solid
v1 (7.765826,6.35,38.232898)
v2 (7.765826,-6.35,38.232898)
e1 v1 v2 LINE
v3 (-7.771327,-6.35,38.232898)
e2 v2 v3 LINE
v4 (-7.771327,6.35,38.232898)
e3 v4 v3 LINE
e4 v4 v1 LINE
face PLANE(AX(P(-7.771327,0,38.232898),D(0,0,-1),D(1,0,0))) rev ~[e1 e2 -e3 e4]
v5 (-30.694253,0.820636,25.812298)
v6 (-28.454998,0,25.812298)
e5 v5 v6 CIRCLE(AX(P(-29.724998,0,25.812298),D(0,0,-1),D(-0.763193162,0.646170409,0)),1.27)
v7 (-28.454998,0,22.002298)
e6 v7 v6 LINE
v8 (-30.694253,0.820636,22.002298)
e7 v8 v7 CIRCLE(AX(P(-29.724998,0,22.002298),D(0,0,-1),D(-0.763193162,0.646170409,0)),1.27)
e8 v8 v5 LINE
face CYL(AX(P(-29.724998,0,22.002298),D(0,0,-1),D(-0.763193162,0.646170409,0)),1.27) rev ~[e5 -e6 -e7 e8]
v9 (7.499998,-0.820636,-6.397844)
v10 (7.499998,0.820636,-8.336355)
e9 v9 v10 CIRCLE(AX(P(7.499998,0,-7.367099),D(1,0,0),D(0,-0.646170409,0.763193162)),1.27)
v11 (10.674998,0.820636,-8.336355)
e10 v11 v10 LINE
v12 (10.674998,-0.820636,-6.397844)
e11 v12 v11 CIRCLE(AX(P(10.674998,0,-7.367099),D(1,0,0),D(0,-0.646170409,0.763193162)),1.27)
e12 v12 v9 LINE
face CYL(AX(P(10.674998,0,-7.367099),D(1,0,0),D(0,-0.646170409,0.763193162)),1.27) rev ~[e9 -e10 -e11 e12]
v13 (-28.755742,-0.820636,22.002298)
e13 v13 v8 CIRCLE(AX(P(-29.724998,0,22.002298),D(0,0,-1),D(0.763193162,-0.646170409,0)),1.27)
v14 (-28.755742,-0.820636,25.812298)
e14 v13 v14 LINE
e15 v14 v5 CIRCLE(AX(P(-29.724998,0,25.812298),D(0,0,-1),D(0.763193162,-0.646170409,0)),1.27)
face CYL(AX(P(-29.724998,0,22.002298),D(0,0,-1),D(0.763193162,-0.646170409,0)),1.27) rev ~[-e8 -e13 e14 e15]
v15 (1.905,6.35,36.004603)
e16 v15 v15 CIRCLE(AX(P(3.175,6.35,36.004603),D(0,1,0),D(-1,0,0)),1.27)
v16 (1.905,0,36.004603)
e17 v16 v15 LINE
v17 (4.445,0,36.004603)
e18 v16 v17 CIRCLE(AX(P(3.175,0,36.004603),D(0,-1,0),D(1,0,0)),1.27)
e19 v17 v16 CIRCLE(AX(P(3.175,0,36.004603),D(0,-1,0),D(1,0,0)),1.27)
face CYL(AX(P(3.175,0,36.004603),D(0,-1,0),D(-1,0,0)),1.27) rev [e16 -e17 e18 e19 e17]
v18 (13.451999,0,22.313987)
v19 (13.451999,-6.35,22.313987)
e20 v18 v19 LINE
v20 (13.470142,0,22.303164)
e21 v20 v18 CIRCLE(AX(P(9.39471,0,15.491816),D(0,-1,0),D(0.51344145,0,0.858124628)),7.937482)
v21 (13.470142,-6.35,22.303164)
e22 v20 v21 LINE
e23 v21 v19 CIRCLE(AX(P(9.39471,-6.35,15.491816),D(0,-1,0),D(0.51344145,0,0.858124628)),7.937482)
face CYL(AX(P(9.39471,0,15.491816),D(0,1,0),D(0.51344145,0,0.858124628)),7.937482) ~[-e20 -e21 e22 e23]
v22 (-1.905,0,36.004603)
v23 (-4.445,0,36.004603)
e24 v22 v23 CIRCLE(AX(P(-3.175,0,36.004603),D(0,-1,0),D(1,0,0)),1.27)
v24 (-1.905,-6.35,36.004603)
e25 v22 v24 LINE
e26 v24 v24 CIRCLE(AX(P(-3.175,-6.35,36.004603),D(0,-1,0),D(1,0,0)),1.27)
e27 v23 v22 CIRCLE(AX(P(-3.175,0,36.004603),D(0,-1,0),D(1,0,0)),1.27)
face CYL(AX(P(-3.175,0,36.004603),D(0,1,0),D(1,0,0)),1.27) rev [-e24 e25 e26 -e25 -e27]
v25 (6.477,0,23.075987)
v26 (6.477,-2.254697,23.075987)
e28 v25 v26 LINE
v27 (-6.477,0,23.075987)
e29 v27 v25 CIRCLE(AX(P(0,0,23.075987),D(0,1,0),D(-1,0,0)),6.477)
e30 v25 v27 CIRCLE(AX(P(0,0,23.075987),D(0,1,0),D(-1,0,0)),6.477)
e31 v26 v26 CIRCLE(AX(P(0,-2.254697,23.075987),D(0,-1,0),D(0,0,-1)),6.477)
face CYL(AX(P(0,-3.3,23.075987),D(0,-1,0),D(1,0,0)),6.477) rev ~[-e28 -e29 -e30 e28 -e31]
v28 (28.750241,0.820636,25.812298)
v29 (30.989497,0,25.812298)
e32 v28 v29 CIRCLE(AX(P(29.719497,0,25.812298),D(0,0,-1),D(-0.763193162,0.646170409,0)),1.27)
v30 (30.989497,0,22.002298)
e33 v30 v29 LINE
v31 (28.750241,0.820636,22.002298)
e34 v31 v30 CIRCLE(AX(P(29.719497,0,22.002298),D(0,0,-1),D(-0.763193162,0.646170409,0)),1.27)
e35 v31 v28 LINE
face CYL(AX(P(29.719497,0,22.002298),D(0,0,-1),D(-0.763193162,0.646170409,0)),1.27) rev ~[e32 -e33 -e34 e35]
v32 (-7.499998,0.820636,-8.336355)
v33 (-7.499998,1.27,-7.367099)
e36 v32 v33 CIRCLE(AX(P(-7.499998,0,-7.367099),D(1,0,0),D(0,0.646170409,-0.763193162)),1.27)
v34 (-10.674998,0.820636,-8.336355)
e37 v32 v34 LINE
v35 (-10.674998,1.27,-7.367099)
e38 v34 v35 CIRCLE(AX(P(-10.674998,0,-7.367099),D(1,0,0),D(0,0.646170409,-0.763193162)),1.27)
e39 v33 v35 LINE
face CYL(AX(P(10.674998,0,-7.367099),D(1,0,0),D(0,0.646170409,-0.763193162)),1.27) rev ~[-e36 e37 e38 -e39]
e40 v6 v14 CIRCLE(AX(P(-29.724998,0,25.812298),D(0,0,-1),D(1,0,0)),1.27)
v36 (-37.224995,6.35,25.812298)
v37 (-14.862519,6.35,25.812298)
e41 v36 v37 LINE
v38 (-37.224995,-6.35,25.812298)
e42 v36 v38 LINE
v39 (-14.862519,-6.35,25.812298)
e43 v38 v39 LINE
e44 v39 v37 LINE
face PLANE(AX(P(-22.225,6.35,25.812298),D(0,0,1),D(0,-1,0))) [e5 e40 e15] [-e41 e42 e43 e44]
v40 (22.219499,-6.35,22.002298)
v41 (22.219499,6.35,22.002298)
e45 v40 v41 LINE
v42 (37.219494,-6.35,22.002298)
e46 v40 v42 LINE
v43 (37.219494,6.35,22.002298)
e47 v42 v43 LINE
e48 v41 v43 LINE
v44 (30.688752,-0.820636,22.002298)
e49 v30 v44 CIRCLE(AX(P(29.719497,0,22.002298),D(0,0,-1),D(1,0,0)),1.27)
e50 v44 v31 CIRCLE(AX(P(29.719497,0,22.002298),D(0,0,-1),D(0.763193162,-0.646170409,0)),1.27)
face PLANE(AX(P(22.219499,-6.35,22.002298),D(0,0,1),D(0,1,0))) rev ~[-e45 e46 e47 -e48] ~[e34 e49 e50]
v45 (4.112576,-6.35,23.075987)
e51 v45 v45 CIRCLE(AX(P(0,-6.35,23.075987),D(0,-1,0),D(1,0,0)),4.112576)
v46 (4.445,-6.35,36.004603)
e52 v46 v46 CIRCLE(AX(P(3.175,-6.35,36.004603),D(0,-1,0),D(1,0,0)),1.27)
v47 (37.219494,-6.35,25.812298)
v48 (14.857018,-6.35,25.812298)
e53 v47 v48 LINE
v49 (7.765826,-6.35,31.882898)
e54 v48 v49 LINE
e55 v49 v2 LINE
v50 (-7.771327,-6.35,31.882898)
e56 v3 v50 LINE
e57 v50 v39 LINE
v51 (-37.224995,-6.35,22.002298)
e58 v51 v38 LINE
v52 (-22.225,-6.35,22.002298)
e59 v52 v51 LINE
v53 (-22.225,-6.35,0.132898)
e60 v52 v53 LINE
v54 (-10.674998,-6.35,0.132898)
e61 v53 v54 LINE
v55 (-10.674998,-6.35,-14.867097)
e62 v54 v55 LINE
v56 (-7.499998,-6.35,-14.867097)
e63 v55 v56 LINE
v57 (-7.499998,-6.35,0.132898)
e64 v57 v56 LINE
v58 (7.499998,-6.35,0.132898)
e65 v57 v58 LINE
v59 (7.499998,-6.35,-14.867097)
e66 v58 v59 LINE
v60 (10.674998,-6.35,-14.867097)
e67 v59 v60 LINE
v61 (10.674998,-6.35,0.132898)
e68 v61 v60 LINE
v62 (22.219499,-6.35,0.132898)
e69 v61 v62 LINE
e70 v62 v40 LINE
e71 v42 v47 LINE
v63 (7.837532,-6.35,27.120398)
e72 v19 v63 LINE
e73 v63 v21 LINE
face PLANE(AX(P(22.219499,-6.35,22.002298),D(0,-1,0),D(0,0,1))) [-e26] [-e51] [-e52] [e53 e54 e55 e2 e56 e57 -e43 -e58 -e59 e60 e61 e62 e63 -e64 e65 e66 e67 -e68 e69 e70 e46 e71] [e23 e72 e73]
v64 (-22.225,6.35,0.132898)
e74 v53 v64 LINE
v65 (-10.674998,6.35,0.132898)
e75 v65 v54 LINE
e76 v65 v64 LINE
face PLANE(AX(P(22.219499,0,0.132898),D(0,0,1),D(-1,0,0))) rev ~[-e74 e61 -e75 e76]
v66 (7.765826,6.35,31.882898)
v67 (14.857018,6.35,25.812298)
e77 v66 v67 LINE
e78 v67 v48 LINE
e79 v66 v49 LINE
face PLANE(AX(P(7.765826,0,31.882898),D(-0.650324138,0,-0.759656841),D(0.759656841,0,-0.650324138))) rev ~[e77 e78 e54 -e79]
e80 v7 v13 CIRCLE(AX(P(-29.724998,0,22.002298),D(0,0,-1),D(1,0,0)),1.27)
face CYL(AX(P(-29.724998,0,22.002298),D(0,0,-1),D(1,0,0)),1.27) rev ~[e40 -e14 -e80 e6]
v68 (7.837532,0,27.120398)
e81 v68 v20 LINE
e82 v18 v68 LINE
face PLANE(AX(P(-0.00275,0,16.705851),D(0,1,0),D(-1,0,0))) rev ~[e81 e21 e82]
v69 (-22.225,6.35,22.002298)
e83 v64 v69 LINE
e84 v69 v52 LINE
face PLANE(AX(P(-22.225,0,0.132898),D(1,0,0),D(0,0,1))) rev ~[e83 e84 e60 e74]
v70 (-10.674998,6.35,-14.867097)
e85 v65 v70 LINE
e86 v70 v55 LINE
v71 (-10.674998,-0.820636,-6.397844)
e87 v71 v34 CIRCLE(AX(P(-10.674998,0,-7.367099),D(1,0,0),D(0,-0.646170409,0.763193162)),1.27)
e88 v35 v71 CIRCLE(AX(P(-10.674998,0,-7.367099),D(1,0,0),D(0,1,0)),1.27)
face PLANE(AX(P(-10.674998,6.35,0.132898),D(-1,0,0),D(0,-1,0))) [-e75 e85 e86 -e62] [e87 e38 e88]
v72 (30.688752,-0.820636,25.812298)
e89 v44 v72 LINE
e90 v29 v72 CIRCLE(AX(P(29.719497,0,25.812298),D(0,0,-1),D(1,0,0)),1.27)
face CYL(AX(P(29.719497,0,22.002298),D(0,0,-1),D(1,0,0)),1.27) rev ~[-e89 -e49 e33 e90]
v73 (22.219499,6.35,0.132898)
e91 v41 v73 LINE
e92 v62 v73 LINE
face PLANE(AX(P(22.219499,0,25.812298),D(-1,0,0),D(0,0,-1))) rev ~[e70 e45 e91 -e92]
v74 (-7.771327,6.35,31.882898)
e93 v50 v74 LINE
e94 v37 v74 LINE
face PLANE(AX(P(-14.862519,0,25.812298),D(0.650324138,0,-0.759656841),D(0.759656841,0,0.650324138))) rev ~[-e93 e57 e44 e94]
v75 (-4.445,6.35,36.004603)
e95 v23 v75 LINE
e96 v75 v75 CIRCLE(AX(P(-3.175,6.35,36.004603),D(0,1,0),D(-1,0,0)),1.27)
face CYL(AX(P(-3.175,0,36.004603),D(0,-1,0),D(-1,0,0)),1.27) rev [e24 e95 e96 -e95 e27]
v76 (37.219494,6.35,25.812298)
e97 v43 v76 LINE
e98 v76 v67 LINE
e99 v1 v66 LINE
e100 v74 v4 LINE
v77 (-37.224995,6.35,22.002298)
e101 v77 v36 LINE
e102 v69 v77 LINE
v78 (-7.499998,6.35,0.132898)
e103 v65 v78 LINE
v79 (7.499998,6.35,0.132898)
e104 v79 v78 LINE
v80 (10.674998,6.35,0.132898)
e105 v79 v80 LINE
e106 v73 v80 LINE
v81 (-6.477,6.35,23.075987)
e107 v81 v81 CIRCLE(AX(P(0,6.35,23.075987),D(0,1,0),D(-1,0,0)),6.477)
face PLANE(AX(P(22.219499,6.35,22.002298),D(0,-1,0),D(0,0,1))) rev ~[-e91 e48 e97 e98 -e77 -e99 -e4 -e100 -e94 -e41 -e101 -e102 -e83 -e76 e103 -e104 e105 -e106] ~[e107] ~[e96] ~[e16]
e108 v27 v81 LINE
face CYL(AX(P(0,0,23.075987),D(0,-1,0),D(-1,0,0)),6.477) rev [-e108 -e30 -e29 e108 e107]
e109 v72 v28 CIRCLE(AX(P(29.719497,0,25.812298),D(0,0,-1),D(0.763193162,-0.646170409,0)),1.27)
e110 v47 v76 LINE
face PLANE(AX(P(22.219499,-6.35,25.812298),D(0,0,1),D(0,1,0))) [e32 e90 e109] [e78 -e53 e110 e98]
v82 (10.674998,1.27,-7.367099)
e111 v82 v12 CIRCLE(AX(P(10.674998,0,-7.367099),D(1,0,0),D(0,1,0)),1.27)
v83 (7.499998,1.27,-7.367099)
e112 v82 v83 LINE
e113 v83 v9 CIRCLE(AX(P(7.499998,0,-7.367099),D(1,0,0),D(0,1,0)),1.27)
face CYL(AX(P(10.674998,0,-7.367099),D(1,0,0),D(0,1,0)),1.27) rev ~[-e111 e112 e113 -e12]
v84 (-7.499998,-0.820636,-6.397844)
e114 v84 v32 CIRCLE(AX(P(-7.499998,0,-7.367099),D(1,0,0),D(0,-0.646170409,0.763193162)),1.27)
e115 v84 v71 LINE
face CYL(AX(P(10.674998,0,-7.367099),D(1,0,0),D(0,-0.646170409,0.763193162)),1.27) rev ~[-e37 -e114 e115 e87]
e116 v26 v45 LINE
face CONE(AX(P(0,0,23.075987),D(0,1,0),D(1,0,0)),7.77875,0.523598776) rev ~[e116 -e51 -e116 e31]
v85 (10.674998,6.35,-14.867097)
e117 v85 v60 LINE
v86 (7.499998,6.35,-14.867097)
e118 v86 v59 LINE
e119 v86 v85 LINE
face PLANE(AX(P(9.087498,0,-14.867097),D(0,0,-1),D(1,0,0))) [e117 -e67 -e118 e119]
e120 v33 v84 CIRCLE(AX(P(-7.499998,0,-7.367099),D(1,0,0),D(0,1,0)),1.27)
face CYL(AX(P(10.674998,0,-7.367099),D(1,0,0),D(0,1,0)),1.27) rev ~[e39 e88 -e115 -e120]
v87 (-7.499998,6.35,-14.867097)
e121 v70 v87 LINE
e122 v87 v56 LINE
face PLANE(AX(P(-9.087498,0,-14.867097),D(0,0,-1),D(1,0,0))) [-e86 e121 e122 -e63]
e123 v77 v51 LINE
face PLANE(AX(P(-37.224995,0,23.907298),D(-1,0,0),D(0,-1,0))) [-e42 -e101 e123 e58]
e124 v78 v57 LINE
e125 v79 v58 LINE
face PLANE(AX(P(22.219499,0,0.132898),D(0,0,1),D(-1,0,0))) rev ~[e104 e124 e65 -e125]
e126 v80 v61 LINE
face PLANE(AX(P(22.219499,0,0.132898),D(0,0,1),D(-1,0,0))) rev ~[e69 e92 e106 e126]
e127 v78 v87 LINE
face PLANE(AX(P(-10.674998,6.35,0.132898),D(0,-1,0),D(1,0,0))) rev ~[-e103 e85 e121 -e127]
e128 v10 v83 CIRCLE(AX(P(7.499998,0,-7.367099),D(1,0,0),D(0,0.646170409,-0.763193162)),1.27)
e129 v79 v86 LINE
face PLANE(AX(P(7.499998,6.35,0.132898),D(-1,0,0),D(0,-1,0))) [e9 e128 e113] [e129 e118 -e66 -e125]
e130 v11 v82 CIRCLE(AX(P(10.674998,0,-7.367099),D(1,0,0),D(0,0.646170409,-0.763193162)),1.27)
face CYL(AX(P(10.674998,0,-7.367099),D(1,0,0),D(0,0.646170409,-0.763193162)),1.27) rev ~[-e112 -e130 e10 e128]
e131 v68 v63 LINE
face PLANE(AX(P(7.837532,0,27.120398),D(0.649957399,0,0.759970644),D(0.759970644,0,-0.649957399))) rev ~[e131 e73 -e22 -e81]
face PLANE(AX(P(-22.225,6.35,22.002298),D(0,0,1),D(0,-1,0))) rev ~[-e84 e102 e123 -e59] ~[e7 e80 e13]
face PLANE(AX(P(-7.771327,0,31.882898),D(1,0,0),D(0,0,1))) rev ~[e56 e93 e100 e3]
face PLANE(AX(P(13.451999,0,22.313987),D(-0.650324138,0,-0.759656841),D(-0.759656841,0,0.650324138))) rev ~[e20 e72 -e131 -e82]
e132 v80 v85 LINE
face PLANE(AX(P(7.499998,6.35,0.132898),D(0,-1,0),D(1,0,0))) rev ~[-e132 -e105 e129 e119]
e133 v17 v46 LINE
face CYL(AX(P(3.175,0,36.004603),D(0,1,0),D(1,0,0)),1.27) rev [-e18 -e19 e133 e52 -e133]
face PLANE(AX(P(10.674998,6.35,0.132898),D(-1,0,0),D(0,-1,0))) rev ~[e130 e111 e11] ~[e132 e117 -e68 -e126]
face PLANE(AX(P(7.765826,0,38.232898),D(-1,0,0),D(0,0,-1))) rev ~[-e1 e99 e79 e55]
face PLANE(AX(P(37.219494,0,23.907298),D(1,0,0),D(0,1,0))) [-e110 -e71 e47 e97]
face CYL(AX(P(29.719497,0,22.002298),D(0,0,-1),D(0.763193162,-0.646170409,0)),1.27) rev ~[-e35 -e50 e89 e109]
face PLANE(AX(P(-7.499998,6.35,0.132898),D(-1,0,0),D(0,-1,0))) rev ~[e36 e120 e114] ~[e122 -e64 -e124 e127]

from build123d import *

# Parameters (mm, degrees)
F0_R        = 1.27
F0_R_2      = 3.96875
F1_DEPTH    = 6.35
F2_R        = 6.477
F2_R_2      = 1.27
F3_DEPTH    = 6.35
F4_S5_R     = 6.477
F4_T6_DEPTH = 13
F5_W        = 12.7
F5_H        = 3.81
F6_DEPTH    = 14.9999954
F8_DEPTH    = 25.4
F9_W        = 12.7
F9_H        = 3.81
F10_DEPTH   = 14.9999954
F12_DEPTH   = 25.4
F13_W       = 3.175
F13_H       = 12.7
F14_DEPTH   = 14.9999954
F16_DEPTH   = 25.4


# Not quite as in the source:
# - a fillet or chamfer that OpenCascade refuses, or shapes differently, is made with other operations: its cross-section is extruded or revolved along the edge and cut away or added
# - after a boolean that leaves OpenCascade's solid faulty, fix() repairs it
# - ends of sketch curves that miss each other by under 0.0002 mm in the source are joined


with BuildPart() as f1:
    # F0 (on Front) → F1 (new body)
    with BuildSketch(Plane.XZ):
        Polygon((-7.493, 0.1328983575), (0, 0.1328983575), (7.493, 0.1328983575), (22.2194990303, 0.1328983575), (22.2194990303, 19.5094533027), (14.8570176459, 25.8122983575), (7.7658264293, 31.8828983575), (7.7658264293, 38.2328983575), (-7.7713273633, 38.2328983575), (-7.7713273633, 31.8828983575), (-14.8625185798, 25.8122983575), (-22.2249999642, 19.5094533027), (-22.2249999642, 4.5234533027), (-22.2249999642, 0.1328983575), align=None)
        with Locations((-3.175, 36.0046029091)):
            Circle(F0_R, mode=Mode.SUBTRACT)
        with BuildLine():
            ThreePointArc((-1.6471995105, 13.7654938087), (-14.0416307026, 9.056743723), (-13.4701421127, 22.3031640975))
            Line((-13.4701421127, 22.3031640975), (-7.8430329322, 27.1203983575))
            Line((-7.8430329322, 27.1203983575), (-3.175, 27.1203983575))
            Line((-3.175, 27.1203983575), (-3.175, 30.2953983575))
            Line((-3.175, 30.2953983575), (-3.175, 33.4703983575))
            Line((-3.175, 33.4703983575), (3.175, 33.4703983575))
            Line((3.175, 33.4703983575), (3.175, 30.2953983575))
            Line((3.175, 30.2953983575), (3.175, 27.1203983575))
            Line((3.175, 27.1203983575), (7.8375319983, 27.1203983575))
            Line((7.8375319983, 27.1203983575), (13.4701421127, 22.3031640975))
            ThreePointArc((13.4701421127, 22.3031640975), (16.2995077669, 19.40684068), (17.3322006389, 15.4917998403))
            ThreePointArc((17.3322006389, 15.4917998403), (10.2711150187, 7.6028326022), (1.6507381924, 13.7496885133))
            ThreePointArc((1.6507381924, 13.7496885133), (0.0063534061, 14.7141035739), (-1.6471995105, 13.7654938087))
        make_face(mode=Mode.SUBTRACT)
        with Locations((3.175, 36.0046029091)):
            Circle(F0_R, mode=Mode.SUBTRACT)
        Polygon((14.8570176459, 25.8122983575), (22.2194990303, 19.5094533027), (22.2194990303, 25.8122983575), (17.4187807526, 25.8122983575), align=None)
        Polygon((-22.2249999642, 25.8122983575), (-22.2249999642, 19.5094533027), (-14.8625185798, 25.8122983575), (-17.4242816865, 25.8122983575), align=None)
        with BuildLine():
            ThreePointArc((13.4519986436, 22.3139871107), (4.7326542757, 21.9159130054), (1.6507381924, 13.7496885133))
            ThreePointArc((1.6507381924, 13.7496885133), (10.2711150187, 7.6028326022), (17.3322006389, 15.4917998403))
            ThreePointArc((17.3322006389, 15.4917998403), (16.2995077669, 19.40684068), (13.4701421127, 22.3031640975))
            ThreePointArc((13.4701421127, 22.3031640975), (13.461073979, 22.3085816404), (13.4519986436, 22.3139871107))
        make_face()
        with BuildLine():
            ThreePointArc((-1.4572006389, 15.4917998403), (-5.4796598384, 22.3966069904), (-13.4701421898, 22.3031640514))
            ThreePointArc((-13.4701421127, 22.3031640975), (-14.0416307026, 9.056743723), (-1.6471995105, 13.7654938087))
            ThreePointArc((-1.6471995105, 13.7654938087), (-1.5048433381, 14.6234346974), (-1.4572006389, 15.4917998403))
        make_face()
        with BuildLine():
            Line((-7.8430329322, 27.1203983575), (-13.4701422669, 22.3031640053))
            ThreePointArc((-13.4701421898, 22.3031640514), (-5.4796598384, 22.3966069904), (-1.4572006389, 15.4917998403))
            ThreePointArc((-1.4572006389, 15.4917998403), (-1.5048433381, 14.6234346974), (-1.6471995105, 13.7654938087))
            ThreePointArc((-1.6471995105, 13.7654938087), (0.0063534061, 14.7141035739), (1.6507381924, 13.7496885133))
            ThreePointArc((1.6507381924, 13.7496885133), (4.7326542757, 21.9159130054), (13.4519986436, 22.3139871107))
            Line((13.4519986436, 22.3139871107), (7.8375319983, 27.1203983575))
            Line((7.8375319983, 27.1203983575), (3.175, 27.1203983575))
            Line((3.175, 27.1203983575), (3.175, 30.2953983575))
            Line((3.175, 30.2953983575), (3.175, 33.4703983575))
            Line((3.175, 33.4703983575), (-3.175, 33.4703983575))
            Line((-3.175, 33.4703983575), (-3.175, 30.2953983575))
            Line((-3.175, 30.2953983575), (-3.175, 27.1203983575))
            Line((-3.175, 27.1203983575), (-7.8430329322, 27.1203983575))
        make_face()
        with Locations((0, 23.0759866536)):
            Circle(F0_R_2, mode=Mode.SUBTRACT)
    extrude(amount=F1_DEPTH)

    # F2 (on face) → F3 (join)
    with BuildSketch(Plane(origin=(0, 0, 0), x_dir=(-1, 0, 0), z_dir=(0, 1, 0))):
        Polygon((-22.2194990303, 25.8122983575), (-22.2194990303, 0.1328983575), (22.2249999642, 0.1328983575), (22.2249999642, 25.8122983575), (14.8625185798, 25.8122983575), (7.7713273633, 31.8828983575), (7.7713273633, 38.2328983575), (-7.7658264293, 38.2328983575), (-7.7658264293, 31.8828983575), (-14.8570176459, 25.8122983575), align=None)
        with Locations((0, 23.0759866536)):
            Circle(F2_R, mode=Mode.SUBTRACT)
        with Locations((-3.175, 36.0046029091)):
            Circle(F2_R_2, mode=Mode.SUBTRACT)
        with Locations((3.175, 36.0046029091)):
            Circle(F2_R_2, mode=Mode.SUBTRACT)
    extrude(amount=F3_DEPTH)

    # F4: chamfer of 3.81 x 6.5991135768 on 1 edges, made by hand


with BuildPart() as f4_tool2:
    # F4_s3 → F4_t4 (revolve)
    with BuildSketch(Plane.XY.offset(23.0759866536)):
        Polygon((7.77875, 0), (3.96875, -6.5991135768), (3.96875, 0), align=None)
    revolve(axis=Axis((0, 0, 23.0759866536), (0, -1, 0)))

    # F4_s5 → F4_t6 (intersect, symmetric)
    with BuildSketch(Plane.XZ.offset(3.3)):
        with Locations((0, 23.0759866536)):
            Circle(F4_S5_R)
    extrude(amount=F4_T6_DEPTH, both=True, mode=Mode.INTERSECT)


with BuildPart() as f1_1:
    add(f1.part)

    # F4_t1: cut F4_tool2
    add(f4_tool2.part, mode=Mode.SUBTRACT)

    # F5 (on face) → F6 (join)
    with BuildSketch(Plane(origin=(-22.2249999642, 0, 0), x_dir=(0, -1, 0), z_dir=(-1, 0, 0))):
        with Locations((0, 23.9072983575)):
            Rectangle(F5_W, F5_H)
    extrude(amount=F6_DEPTH)

    # F7 (on face) → F8 (cut)
    with BuildSketch(Plane(origin=(0, 0, 22.0022983575), x_dir=(1, 0, 0), z_dir=(0, 0, -1))):
        with BuildLine():
            ThreePointArc((-28.7557423483, 0.8206364192), (-30.5456340834, 0.969255316), (-30.6942529802, -0.8206364192))
            Line((-30.6942529802, -0.8206364192), (-28.7557423483, 0.8206364192))
        make_face()
        with BuildLine():
            Line((-28.7557423483, 0.8206364192), (-30.6942529802, -0.8206364192))
            ThreePointArc((-30.6942529802, -0.8206364192), (-29.2879932313, -1.1924458586), (-28.4549976642, 0))
            ThreePointArc((-28.4549976642, 0), (-28.5325518057, 0.4370044329), (-28.7557423483, 0.8206364192))
        make_face()
    extrude(amount=-F8_DEPTH, mode=Mode.SUBTRACT)

    # F9 (on face) → F10 (join)
    with BuildSketch(Plane.YZ.offset(22.2194990303)):
        with Locations((0, 23.9072983575)):
            Rectangle(F9_W, F9_H)
    extrude(amount=F10_DEPTH)

    # F11 (on face) → F12 (cut)
    with BuildSketch(Plane(origin=(0, 0, 22.0022983575), x_dir=(1, 0, 0), z_dir=(0, 0, -1))):
        with BuildLine():
            ThreePointArc((30.9894967303, 0), (30.9119425889, 0.4370044329), (30.6887520463, 0.8206364192))
            Line((30.6887520463, 0.8206364192), (28.7502414143, -0.8206364192))
            ThreePointArc((28.7502414143, -0.8206364192), (30.1565011632, -1.1924458586), (30.9894967303, 0))
        make_face()
        with BuildLine():
            Line((28.7502414143, -0.8206364192), (30.6887520463, 0.8206364192))
            ThreePointArc((30.6887520463, 0.8206364192), (28.8988603111, 0.969255316), (28.7502414143, -0.8206364192))
        make_face()
    extrude(amount=-F12_DEPTH, mode=Mode.SUBTRACT)

    # F13 (on face) → F14 (join)
    with BuildSketch(Plane(origin=(0, 0, 0.1328983575), x_dir=(1, 0, 0), z_dir=(0, 0, -1))):
        with Locations((9.0874977, 0)):
            Rectangle(F13_W, F13_H)
        with Locations((-9.0874977, 0)):
            Rectangle(F13_W, F13_H)
    extrude(amount=F14_DEPTH)

    add(f1_1.part.fix(), mode=Mode.REPLACE)

    # F15 (on face) → F16 (cut)
    with BuildSketch(Plane.YZ.offset(10.6749977)):
        with BuildLine():
            ThreePointArc((1.27, -7.3670993425), (0.5341777549, -6.2149039918), (-0.8206364192, -6.3978440265))
            Line((-0.8206364192, -6.3978440265), (0.8206364192, -8.3363546585))
            ThreePointArc((0.8206364192, -8.3363546585), (1.1521953507, -7.9012770974), (1.27, -7.3670993425))
        make_face()
        with BuildLine():
            Line((0.8206364192, -8.3363546585), (-0.8206364192, -6.3978440265))
            ThreePointArc((-0.8206364192, -6.3978440265), (-0.969255316, -8.1877357617), (0.8206364192, -8.3363546585))
        make_face()
    extrude(amount=-F16_DEPTH, mode=Mode.SUBTRACT)


solid = f1_1.part
